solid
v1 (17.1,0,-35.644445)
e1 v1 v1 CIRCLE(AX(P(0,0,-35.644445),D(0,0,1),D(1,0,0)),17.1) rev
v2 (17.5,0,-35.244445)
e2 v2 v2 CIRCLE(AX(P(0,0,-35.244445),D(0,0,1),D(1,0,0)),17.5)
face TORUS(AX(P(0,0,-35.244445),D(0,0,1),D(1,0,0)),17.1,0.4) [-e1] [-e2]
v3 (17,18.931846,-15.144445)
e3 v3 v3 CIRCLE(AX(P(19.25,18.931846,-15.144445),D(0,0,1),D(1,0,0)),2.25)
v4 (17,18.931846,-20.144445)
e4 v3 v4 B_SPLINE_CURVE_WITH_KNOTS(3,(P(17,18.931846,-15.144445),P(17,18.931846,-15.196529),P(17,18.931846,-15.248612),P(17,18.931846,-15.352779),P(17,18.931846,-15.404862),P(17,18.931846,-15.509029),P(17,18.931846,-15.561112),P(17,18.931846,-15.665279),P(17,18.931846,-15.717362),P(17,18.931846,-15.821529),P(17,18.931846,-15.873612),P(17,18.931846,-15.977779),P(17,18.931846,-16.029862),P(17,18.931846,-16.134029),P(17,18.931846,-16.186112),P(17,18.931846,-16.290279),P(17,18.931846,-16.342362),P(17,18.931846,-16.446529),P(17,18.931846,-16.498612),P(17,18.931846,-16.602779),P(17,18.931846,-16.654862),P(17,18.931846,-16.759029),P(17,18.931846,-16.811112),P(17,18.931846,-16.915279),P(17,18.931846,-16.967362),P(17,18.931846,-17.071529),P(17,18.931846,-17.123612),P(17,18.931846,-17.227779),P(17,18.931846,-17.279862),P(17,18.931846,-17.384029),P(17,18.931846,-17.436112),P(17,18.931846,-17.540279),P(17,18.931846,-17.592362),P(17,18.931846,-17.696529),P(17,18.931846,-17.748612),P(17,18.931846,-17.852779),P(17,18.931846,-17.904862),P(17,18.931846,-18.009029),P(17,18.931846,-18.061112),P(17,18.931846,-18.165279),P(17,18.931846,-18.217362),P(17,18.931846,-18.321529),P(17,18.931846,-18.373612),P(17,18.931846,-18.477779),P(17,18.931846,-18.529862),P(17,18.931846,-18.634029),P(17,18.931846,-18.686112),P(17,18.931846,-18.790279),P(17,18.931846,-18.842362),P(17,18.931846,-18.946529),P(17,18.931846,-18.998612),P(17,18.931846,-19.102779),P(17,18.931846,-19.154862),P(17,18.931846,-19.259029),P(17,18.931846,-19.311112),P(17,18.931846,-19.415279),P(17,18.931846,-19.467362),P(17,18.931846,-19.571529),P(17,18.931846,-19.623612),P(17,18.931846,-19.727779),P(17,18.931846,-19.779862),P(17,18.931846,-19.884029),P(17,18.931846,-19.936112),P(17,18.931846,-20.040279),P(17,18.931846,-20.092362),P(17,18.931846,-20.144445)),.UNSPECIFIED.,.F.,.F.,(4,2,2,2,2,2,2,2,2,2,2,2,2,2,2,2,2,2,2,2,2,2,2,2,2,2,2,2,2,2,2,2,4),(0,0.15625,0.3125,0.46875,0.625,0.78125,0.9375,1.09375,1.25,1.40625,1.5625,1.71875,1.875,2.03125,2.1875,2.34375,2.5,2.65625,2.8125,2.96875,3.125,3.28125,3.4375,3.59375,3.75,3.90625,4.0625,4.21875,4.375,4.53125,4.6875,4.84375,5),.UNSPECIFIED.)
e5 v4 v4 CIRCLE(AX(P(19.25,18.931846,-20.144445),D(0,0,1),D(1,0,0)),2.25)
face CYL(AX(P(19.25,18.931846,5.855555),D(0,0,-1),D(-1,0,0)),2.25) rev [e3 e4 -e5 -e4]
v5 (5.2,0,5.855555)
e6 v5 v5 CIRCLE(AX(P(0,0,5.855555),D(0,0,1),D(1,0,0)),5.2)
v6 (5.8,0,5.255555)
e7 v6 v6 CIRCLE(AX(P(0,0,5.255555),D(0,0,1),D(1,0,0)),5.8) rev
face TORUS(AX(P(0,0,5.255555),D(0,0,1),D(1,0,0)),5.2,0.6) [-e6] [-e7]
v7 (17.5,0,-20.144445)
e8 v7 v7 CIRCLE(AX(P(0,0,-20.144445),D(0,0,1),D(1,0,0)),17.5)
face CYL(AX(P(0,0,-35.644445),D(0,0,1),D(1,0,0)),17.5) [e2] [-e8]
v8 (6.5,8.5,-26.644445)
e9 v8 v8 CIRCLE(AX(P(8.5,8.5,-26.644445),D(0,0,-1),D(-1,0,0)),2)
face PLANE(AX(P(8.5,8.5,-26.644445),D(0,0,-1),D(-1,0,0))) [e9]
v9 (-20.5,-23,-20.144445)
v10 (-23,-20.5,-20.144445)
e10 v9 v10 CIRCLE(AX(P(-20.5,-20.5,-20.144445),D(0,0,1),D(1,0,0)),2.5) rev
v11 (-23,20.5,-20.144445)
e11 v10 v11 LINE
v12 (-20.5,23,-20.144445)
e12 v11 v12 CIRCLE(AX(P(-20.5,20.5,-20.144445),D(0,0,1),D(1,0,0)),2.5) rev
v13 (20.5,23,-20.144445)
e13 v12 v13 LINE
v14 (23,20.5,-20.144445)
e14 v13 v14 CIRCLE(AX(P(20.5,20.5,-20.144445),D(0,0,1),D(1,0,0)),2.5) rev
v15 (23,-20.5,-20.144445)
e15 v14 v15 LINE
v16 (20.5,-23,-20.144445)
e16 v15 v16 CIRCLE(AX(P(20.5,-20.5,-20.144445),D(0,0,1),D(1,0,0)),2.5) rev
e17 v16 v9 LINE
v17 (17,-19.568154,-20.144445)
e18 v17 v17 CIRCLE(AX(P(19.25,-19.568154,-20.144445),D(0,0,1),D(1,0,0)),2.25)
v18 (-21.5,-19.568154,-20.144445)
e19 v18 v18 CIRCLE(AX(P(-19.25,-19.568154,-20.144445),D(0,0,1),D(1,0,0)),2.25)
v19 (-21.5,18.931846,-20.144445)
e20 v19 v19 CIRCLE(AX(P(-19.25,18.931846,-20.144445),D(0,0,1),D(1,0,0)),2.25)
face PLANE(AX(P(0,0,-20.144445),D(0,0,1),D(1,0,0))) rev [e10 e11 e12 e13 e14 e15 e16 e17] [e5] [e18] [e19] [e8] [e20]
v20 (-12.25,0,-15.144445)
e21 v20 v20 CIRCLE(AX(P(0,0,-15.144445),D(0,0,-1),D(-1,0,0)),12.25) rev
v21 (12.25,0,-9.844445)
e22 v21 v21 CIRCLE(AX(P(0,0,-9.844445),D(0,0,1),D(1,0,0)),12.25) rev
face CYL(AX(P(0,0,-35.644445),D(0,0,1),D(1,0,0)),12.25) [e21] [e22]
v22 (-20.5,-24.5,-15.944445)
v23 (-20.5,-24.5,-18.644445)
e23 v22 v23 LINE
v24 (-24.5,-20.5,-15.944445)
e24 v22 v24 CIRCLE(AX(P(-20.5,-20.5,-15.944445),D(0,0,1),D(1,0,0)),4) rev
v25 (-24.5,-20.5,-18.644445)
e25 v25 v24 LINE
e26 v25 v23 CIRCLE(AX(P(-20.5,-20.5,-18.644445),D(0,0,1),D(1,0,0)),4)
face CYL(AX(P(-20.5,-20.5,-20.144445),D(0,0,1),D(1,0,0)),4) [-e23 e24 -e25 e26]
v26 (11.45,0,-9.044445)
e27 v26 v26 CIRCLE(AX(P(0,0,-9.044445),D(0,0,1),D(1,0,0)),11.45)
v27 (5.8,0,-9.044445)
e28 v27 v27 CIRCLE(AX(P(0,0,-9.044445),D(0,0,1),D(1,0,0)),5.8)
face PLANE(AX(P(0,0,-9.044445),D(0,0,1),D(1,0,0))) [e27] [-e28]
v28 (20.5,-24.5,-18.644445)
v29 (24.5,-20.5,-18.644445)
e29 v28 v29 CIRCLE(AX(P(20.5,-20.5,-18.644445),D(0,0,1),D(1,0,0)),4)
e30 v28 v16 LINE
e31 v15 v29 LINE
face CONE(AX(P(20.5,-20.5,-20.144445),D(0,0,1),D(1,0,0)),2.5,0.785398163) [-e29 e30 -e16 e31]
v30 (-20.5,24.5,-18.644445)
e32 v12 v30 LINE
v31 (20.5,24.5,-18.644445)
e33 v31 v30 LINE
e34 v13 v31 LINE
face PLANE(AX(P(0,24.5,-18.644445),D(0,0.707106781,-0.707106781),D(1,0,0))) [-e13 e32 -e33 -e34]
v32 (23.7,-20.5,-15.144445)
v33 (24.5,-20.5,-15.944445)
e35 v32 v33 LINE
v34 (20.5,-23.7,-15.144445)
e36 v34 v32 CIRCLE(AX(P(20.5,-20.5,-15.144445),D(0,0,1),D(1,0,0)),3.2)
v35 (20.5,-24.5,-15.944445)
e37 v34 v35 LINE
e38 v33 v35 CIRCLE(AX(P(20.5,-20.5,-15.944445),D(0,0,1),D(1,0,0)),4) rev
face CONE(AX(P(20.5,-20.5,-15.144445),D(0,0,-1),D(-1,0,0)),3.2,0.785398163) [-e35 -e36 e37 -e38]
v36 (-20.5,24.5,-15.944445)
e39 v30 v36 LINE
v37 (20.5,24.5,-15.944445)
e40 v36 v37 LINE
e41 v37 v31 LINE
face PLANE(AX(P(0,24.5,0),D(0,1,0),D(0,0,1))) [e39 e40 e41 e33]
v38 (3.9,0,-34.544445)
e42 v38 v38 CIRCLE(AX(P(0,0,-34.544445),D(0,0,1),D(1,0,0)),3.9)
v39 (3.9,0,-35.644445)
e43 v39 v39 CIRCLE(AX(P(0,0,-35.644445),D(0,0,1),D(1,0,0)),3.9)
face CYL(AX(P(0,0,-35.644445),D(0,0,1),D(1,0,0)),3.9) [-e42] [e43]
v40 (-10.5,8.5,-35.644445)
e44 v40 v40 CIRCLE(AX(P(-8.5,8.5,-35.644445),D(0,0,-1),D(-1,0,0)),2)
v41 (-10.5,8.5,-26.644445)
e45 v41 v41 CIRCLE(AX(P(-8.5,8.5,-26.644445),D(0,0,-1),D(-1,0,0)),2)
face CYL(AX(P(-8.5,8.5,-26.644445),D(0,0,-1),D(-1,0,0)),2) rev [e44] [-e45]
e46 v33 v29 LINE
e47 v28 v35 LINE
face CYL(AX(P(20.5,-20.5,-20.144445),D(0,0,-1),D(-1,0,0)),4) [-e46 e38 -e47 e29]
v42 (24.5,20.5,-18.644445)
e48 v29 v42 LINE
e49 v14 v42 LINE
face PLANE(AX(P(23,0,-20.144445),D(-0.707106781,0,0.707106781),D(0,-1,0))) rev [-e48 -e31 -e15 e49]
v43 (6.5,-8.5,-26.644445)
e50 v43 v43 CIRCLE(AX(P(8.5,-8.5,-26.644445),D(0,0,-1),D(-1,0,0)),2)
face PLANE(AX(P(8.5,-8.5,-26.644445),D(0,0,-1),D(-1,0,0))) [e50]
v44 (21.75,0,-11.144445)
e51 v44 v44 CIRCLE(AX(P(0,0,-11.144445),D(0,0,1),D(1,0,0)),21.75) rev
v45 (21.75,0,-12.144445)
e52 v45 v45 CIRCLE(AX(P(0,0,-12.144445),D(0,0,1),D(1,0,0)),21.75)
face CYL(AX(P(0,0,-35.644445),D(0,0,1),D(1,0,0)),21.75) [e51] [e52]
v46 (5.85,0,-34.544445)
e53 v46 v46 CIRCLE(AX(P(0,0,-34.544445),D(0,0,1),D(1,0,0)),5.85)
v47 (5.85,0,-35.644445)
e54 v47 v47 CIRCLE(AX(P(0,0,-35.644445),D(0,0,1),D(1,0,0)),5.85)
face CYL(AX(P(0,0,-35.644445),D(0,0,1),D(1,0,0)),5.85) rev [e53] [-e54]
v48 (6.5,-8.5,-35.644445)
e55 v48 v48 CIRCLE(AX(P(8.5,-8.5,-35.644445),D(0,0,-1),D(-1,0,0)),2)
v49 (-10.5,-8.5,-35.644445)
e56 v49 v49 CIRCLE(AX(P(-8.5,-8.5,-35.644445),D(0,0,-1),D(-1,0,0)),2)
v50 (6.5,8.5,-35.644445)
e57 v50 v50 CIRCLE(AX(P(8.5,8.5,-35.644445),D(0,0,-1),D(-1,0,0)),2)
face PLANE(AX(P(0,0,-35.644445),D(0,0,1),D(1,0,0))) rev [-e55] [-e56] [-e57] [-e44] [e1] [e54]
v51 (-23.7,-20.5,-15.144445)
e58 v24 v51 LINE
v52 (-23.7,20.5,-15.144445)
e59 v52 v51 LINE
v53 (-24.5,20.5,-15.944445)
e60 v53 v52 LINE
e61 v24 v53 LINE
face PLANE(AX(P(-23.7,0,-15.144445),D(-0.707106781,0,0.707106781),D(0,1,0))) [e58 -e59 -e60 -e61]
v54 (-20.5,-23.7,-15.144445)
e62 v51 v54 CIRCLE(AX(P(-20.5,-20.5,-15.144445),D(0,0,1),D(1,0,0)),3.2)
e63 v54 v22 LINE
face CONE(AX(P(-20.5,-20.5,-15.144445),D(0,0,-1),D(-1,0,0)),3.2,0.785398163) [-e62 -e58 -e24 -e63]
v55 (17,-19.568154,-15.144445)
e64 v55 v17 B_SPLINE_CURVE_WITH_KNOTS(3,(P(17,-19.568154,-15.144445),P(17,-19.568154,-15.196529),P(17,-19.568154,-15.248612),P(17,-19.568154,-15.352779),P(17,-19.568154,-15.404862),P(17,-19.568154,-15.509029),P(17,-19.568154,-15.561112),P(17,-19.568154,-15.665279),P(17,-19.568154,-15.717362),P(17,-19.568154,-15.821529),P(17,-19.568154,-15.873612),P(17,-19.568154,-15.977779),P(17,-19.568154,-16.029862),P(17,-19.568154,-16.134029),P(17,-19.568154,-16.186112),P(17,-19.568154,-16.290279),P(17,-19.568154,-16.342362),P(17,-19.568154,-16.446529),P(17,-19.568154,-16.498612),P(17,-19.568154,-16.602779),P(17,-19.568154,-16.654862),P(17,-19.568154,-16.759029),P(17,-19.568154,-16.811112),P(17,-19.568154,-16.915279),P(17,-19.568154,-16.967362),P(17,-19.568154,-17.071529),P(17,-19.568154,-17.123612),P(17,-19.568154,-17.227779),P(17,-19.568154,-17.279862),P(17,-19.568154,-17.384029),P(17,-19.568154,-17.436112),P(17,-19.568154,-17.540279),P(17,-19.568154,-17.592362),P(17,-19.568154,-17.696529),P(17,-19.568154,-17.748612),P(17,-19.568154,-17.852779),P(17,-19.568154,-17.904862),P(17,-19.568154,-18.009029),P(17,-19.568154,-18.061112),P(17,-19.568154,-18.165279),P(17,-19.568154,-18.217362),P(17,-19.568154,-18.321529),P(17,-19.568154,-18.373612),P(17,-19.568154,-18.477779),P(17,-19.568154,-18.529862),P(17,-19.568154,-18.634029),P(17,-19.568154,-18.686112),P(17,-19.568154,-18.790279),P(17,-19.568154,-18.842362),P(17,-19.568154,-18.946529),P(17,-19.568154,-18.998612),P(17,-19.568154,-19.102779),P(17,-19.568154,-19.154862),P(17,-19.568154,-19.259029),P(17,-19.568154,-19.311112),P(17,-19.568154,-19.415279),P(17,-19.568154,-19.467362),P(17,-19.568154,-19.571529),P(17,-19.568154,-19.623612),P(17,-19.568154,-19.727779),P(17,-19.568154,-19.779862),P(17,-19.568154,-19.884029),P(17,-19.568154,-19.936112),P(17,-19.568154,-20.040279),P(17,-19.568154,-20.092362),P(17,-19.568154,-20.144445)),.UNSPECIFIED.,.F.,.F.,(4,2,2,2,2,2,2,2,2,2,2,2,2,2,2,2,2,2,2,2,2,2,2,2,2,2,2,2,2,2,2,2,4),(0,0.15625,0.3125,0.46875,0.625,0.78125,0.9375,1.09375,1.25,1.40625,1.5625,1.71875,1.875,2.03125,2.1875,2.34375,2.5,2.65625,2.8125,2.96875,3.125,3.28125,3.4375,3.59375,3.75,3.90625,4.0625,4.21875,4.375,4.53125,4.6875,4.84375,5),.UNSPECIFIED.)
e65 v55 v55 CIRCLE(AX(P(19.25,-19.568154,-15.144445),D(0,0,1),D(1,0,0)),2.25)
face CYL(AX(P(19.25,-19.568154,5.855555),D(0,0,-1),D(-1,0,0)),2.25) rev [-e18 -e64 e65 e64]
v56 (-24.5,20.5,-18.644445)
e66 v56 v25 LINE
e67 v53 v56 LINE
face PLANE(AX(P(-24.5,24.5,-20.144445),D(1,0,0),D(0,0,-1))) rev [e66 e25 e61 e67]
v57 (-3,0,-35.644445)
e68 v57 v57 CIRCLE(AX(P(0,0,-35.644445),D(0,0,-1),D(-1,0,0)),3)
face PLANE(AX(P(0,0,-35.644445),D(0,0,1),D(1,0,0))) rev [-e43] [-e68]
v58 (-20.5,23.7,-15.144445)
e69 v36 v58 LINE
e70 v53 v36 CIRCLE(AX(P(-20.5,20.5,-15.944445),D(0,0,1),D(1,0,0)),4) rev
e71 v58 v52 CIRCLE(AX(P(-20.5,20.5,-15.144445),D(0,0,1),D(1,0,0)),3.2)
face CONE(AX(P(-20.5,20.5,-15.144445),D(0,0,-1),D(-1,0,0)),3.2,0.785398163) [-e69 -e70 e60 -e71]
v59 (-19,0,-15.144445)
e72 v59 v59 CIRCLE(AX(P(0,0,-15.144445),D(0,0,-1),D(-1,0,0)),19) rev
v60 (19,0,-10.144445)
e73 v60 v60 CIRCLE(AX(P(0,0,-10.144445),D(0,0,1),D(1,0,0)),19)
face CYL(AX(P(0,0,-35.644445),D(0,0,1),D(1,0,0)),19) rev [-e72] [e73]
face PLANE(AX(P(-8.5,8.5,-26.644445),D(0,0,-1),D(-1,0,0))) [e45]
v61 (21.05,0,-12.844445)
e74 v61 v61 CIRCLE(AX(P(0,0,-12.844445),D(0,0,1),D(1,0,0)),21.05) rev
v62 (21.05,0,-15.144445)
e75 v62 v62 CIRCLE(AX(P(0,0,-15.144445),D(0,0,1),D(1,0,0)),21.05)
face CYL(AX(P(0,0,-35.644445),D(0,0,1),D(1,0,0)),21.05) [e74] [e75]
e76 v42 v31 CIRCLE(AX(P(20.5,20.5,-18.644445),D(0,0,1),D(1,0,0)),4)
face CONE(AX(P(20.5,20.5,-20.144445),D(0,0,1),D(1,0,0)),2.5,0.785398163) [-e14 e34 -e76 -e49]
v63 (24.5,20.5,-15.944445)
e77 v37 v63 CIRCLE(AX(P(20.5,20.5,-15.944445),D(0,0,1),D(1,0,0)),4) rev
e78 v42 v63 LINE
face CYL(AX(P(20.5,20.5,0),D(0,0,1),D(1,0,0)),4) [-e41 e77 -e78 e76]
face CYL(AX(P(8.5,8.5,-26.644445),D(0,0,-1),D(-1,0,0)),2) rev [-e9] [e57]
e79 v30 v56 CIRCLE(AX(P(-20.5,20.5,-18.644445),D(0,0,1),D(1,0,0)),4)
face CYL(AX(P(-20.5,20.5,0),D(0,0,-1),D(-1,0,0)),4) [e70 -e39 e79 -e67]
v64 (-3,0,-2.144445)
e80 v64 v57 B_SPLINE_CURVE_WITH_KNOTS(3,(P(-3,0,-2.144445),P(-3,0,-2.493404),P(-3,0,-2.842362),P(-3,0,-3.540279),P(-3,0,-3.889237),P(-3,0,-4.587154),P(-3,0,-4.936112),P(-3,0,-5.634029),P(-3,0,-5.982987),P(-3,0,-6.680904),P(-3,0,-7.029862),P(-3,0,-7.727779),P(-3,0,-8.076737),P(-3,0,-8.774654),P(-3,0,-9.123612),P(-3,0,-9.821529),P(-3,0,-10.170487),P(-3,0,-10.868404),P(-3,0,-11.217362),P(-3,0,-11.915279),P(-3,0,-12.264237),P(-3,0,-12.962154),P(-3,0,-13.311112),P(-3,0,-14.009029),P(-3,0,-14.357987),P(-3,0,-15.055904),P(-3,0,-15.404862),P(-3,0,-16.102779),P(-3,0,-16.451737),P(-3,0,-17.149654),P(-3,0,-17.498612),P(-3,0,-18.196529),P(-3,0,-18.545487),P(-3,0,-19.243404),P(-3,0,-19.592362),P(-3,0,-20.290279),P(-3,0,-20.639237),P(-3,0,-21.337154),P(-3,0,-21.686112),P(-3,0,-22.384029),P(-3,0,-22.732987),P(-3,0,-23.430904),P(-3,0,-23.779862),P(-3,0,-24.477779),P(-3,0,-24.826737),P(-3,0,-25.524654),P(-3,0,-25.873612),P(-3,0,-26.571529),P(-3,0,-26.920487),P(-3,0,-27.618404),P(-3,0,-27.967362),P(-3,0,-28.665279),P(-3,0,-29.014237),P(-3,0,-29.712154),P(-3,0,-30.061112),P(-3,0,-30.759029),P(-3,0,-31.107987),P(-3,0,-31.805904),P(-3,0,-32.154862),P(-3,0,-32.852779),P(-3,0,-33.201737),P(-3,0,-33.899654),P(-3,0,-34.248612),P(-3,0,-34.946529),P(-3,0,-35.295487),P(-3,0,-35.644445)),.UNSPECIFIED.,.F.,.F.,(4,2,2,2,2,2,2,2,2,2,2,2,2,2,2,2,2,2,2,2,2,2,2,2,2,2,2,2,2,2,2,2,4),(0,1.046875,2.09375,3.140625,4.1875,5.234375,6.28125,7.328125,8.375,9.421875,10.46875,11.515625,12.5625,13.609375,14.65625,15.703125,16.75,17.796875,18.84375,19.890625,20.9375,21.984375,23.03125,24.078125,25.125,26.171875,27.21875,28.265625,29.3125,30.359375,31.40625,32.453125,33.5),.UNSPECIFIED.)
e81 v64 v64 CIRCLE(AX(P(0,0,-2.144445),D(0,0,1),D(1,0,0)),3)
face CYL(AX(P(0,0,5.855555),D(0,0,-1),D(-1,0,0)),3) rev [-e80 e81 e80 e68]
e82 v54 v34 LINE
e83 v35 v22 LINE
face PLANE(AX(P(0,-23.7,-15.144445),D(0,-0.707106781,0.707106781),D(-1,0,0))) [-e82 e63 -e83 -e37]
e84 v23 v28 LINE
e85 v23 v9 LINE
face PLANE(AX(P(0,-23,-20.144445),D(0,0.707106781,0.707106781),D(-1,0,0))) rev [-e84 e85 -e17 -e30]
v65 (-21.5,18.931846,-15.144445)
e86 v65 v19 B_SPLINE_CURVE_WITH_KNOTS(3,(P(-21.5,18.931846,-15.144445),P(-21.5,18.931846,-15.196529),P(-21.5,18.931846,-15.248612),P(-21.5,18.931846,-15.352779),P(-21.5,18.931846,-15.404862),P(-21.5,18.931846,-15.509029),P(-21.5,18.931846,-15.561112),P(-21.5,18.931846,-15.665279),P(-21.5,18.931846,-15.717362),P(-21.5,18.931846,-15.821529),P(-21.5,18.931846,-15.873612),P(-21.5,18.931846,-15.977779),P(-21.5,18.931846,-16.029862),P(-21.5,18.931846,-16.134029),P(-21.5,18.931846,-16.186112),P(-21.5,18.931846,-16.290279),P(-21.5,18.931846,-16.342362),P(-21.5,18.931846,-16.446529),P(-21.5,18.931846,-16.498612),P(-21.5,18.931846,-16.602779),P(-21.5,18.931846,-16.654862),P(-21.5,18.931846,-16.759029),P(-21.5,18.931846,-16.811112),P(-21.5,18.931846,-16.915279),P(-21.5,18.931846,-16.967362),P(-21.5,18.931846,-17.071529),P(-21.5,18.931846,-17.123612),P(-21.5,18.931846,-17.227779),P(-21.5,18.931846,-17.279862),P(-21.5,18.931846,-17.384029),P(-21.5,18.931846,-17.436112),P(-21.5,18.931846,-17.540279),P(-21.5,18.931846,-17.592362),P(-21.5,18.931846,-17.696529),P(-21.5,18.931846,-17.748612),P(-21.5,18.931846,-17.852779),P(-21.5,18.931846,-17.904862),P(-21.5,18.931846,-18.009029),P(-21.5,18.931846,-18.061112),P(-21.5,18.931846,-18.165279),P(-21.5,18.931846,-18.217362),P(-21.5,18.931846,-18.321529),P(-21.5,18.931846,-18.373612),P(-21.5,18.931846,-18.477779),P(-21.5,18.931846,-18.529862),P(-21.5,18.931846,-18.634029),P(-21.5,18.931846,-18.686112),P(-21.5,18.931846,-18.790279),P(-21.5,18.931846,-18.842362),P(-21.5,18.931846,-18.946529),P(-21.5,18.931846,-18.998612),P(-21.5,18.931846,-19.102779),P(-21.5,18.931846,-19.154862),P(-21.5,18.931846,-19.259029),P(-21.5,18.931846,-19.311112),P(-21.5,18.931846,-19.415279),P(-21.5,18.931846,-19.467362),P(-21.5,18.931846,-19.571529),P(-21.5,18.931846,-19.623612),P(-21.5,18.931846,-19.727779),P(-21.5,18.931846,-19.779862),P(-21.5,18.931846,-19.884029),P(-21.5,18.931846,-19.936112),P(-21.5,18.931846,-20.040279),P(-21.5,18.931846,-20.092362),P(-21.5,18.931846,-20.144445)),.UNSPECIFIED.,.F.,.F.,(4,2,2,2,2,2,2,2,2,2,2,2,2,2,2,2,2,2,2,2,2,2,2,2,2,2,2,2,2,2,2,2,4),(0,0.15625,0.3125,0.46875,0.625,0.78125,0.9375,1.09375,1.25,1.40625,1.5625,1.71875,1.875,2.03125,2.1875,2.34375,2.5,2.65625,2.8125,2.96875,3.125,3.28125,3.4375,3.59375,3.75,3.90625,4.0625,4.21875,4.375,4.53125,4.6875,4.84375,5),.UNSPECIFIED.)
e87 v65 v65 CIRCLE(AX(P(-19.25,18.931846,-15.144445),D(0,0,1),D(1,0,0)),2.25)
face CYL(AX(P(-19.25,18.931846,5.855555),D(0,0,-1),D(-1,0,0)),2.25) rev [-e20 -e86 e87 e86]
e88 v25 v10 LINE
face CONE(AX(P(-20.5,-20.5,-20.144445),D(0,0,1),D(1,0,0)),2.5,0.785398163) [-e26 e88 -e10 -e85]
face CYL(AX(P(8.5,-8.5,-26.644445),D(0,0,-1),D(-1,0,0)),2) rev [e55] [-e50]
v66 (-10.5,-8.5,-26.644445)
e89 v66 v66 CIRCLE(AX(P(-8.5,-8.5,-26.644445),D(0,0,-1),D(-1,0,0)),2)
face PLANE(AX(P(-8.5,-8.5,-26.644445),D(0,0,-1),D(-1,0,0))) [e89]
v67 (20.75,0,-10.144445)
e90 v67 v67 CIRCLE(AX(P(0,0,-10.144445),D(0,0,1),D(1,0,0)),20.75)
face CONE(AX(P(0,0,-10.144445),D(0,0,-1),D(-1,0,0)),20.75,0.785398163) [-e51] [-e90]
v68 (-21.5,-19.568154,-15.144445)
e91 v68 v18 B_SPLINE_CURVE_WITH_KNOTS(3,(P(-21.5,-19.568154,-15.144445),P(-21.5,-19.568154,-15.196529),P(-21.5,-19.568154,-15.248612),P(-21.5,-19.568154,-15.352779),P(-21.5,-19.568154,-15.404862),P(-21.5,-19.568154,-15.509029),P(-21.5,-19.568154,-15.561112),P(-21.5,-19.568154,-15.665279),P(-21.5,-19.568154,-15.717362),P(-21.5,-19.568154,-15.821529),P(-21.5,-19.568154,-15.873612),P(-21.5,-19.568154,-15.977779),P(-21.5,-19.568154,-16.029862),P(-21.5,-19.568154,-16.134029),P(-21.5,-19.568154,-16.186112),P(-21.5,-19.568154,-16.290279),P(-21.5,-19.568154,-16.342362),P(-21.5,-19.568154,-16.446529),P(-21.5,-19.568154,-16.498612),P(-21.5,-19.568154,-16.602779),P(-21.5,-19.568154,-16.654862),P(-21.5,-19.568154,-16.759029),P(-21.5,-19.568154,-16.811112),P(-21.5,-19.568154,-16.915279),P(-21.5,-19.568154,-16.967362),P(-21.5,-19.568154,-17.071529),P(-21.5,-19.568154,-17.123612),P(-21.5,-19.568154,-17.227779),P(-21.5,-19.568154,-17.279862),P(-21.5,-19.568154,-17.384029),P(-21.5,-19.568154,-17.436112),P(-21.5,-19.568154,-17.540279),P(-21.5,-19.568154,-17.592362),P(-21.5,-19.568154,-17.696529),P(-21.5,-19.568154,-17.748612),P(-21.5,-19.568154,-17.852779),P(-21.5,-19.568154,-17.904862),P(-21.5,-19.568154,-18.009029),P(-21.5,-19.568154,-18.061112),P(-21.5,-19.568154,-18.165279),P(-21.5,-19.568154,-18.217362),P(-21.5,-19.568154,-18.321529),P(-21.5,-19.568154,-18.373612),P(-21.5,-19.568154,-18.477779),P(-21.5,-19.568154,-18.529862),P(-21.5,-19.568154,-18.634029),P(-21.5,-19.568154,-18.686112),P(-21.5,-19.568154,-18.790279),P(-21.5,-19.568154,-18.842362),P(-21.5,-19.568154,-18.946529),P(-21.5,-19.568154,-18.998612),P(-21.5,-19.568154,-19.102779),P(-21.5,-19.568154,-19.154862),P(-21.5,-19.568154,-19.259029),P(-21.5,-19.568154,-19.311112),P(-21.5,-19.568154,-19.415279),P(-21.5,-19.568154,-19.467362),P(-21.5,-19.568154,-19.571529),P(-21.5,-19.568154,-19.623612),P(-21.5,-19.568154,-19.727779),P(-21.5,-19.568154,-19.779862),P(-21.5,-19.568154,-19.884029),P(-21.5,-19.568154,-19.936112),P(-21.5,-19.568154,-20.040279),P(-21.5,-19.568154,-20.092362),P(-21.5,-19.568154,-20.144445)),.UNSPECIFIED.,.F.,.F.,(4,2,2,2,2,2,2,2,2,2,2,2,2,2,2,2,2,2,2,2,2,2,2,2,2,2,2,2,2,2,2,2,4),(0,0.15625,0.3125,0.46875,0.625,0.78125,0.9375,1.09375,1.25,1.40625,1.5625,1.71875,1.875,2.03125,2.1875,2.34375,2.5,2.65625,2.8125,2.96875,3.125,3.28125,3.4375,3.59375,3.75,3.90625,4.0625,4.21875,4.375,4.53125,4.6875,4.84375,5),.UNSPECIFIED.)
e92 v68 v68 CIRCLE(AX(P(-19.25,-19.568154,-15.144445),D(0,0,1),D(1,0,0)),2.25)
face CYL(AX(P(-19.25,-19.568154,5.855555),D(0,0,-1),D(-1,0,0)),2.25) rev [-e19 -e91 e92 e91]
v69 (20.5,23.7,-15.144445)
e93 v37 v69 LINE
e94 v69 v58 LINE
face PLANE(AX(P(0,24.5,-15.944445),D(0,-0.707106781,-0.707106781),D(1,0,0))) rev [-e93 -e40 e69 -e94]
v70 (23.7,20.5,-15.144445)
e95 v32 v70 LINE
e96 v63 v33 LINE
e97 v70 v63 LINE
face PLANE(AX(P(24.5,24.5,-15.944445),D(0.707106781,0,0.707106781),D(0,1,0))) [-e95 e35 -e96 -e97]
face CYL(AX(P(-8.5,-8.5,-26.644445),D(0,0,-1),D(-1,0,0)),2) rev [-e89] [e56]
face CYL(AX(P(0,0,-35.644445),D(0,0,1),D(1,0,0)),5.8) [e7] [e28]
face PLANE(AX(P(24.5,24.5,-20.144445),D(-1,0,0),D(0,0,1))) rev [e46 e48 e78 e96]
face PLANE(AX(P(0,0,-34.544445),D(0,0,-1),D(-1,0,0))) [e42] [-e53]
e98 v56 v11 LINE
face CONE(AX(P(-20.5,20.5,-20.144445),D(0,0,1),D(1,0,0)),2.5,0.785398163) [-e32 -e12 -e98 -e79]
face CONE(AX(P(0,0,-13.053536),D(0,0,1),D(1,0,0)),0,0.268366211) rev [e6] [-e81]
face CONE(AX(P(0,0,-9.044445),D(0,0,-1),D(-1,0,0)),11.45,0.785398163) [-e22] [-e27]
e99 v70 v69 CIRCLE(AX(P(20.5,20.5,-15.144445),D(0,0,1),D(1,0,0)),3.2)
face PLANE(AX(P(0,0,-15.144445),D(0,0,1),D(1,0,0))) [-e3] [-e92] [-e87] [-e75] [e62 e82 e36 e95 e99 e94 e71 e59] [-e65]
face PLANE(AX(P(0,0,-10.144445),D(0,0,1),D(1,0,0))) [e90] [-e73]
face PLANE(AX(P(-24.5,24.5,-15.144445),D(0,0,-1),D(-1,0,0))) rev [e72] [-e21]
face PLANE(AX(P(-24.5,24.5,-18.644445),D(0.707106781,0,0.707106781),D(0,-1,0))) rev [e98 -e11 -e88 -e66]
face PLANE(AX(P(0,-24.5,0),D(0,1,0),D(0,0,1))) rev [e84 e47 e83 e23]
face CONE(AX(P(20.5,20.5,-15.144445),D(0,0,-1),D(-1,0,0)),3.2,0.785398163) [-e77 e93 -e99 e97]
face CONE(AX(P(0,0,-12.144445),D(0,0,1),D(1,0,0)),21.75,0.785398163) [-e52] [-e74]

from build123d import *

# Parameters (mm, degrees)
FILLET_3_R          = 0.6
SKETCH_2_W          = 49
SKETCH_2_H          = 5
EXTRUDE_1_DEPTH     = 24.5
FILLET_4_R          = 4
CHAMFER_3_SIZE      = 1.5
CHAMFER_4_SIZE      = 1
SKETCH_3_R          = 3
CUT_EXTRUDE_1_DEPTH = 55.062463873
SKETCH_4_R          = 2.25
CUT_EXTRUDE_2_DEPTH = 55.062463873
SKETCH_5_R          = 2
CUT_EXTRUDE_3_DEPTH = 9
FILLET_7_R          = 0.4
CHAMFER_5_SIZE      = 0.8
CHAMFER_6_SIZE      = 0.8
CHAMFER_7_SIZE      = 0.8


# Read off the part's stored shape, not the designer's step: 旋转1
# Some blends are built 0.0001 mm under size
with BuildPart() as part:
    # 旋转1 outline → 旋转1 (revolve)
    with BuildSketch(Plane.XZ):
        Polygon((3.9, -35.644445464), (3.9, -34.544445464), (5.85, -34.544445464), (5.85, -35.644445464), (17.5, -35.644445464), (17.5, -20.144445464), (24.5, -20.144445464), (24.5, -15.144445464), (21.05, -15.144445464), (21.05, -12.944445464), (21.75, -12.944445464), (21.75, -10.144445464), (19, -10.144445464), (19, -17.144445464), (12.25, -17.144445464), (12.25, -9.044445464), (5.8, -9.044445464), (5.8, 5.855554536), (5.2, 5.855554536), (0, -13.053536373), (0, -35.644445464), align=None)
    revolve(axis=Axis((0, 0, 0), (0, 0, 1)))

    # 圆角3
    fillet_3_edges = [part.edges().sort_by_distance(p)[0] for p in [
        (-5.8, 0, 5.855554536),
    ]]
    fillet(fillet_3_edges, radius=FILLET_3_R - 0.0001)  # a hair under: the kernel refuses the full size

    # 草图2 → 凸台-拉伸1 (add, symmetric)
    with BuildSketch(Plane(origin=(0, 0, 0), x_dir=(1, 0, 0), z_dir=(0, 1, 0))):
        with Locations((0, 17.644445464)):
            Rectangle(SKETCH_2_W, SKETCH_2_H)
    extrude(amount=EXTRUDE_1_DEPTH, both=True)

    # 圆角4
    fillet_4_edges = [part.edges().sort_by_distance(p)[0] for p in [
        (24.5, -24.5, -17.644445464),
        (-24.5, 24.5, -17.644445464),
        (-24.5, -24.5, -17.644445464),
        (24.5, 24.5, -17.644445464),
    ]]
    fillet(fillet_4_edges, radius=FILLET_4_R)

    # 倒角3
    chamfer_3_edges = [part.edges().sort_by_distance(p)[0] for p in [
        (0, 24.5, -20.144445464),
        (-24.5, 0, -20.144445464),
        (24.5, 0, -20.144445464),
        (0, -24.5, -20.144445464),
        (23.328427125, 23.328427125, -20.144445464),
        (23.328427125, -23.328427125, -20.144445464),
        (-23.328427125, -23.328427125, -20.144445464),
        (-23.328427125, 23.328427125, -20.144445464),
    ]]
    chamfer(chamfer_3_edges, length=CHAMFER_3_SIZE)

    # 倒角4
    chamfer_4_edges = [part.edges().sort_by_distance(p)[0] for p in [
        (-21.75, 0, -10.144445464),
    ]]
    chamfer(chamfer_4_edges, length=CHAMFER_4_SIZE)

    # 草图3 → 切除-拉伸1 (cut, through all)
    with BuildSketch(Plane(origin=(0, 0, -35.644445464), x_dir=(-1, 0, 0), z_dir=(0, 0, -1))):
        Circle(SKETCH_3_R)
    extrude(amount=-CUT_EXTRUDE_1_DEPTH, mode=Mode.SUBTRACT)

    # 草图4 → 切除-拉伸2 (cut, through all)
    with BuildSketch(Plane(origin=(0, 0, -35.644445464), x_dir=(-1, 0, 0), z_dir=(0, 0, -1))):
        with Locations((-19.25, 18.931846081)):
            Circle(SKETCH_4_R)
        with Locations((19.25, 18.931846081)):
            Circle(SKETCH_4_R)
        with Locations((-19.25, -19.568153919)):
            Circle(SKETCH_4_R)
        with Locations((19.25, -19.568153919)):
            Circle(SKETCH_4_R)
    extrude(amount=-CUT_EXTRUDE_2_DEPTH, mode=Mode.SUBTRACT)

    # 草图5 → 切除-拉伸3 (cut)
    with BuildSketch(Plane(origin=(0, 0, -35.644445464), x_dir=(-1, 0, 0), z_dir=(0, 0, -1))):
        with Locations((-8.5, 8.5)):
            Circle(SKETCH_5_R)
        with Locations((8.5, 8.5)):
            Circle(SKETCH_5_R)
        with Locations((8.5, -8.5)):
            Circle(SKETCH_5_R)
        with Locations((-8.5, -8.5)):
            Circle(SKETCH_5_R)
    extrude(amount=-CUT_EXTRUDE_3_DEPTH, mode=Mode.SUBTRACT)

    # 圆角7
    fillet_7_edges = [part.edges().sort_by_distance(p)[0] for p in [
        (-17.5, 0, -35.644445464),
    ]]
    fillet(fillet_7_edges, radius=FILLET_7_R)

    # 倒角5
    chamfer_5_edges = [part.edges().sort_by_distance(p)[0] for p in [
        (-12.25, 0, -9.044445464),
    ]]
    chamfer(chamfer_5_edges, length=CHAMFER_5_SIZE)

    # 倒角6
    # the kernel refuses this chamfer: 0.8 mm, written as the material it takes off along each edge
    with BuildSketch(Plane(origin=(0, 0, -12.944445464), x_dir=(1, 0, 0), z_dir=(0, -1, 0))) as chamfer_6_piece_1_section:
        Polygon((21.75, CHAMFER_6_SIZE), (21.75 - CHAMFER_6_SIZE, 0), (21.75, 0), align=None)
    chamfer_6_piece_1 = revolve(axis=Axis((0, 0, -12.944445464), (0, 0, 1)), mode=Mode.PRIVATE)
    chamfer_6_piece_1 = chamfer_6_piece_1 - Plane(origin=(0, 0, -12.50853459), x_dir=(1, 0, 0), z_dir=(0, 0, 1)) * Cylinder(21.05, 87, mode=Mode.PRIVATE)
    add(chamfer_6_piece_1, mode=Mode.SUBTRACT)

    # 倒角7
    chamfer_7_edges = [part.edges().sort_by_distance(p)[0] for p in [
        (0, 24.5, -15.144445464),
        (24.5, 0, -15.144445464),
        (-24.5, 0, -15.144445464),
        (0, -24.5, -15.144445464),
        (23.328427125, 23.328427125, -15.144445464),
        (23.328427125, -23.328427125, -15.144445464),
        (-23.328427125, -23.328427125, -15.144445464),
        (-23.328427125, 23.328427125, -15.144445464),
    ]]
    chamfer(chamfer_7_edges, length=CHAMFER_7_SIZE)


solid = part.part
